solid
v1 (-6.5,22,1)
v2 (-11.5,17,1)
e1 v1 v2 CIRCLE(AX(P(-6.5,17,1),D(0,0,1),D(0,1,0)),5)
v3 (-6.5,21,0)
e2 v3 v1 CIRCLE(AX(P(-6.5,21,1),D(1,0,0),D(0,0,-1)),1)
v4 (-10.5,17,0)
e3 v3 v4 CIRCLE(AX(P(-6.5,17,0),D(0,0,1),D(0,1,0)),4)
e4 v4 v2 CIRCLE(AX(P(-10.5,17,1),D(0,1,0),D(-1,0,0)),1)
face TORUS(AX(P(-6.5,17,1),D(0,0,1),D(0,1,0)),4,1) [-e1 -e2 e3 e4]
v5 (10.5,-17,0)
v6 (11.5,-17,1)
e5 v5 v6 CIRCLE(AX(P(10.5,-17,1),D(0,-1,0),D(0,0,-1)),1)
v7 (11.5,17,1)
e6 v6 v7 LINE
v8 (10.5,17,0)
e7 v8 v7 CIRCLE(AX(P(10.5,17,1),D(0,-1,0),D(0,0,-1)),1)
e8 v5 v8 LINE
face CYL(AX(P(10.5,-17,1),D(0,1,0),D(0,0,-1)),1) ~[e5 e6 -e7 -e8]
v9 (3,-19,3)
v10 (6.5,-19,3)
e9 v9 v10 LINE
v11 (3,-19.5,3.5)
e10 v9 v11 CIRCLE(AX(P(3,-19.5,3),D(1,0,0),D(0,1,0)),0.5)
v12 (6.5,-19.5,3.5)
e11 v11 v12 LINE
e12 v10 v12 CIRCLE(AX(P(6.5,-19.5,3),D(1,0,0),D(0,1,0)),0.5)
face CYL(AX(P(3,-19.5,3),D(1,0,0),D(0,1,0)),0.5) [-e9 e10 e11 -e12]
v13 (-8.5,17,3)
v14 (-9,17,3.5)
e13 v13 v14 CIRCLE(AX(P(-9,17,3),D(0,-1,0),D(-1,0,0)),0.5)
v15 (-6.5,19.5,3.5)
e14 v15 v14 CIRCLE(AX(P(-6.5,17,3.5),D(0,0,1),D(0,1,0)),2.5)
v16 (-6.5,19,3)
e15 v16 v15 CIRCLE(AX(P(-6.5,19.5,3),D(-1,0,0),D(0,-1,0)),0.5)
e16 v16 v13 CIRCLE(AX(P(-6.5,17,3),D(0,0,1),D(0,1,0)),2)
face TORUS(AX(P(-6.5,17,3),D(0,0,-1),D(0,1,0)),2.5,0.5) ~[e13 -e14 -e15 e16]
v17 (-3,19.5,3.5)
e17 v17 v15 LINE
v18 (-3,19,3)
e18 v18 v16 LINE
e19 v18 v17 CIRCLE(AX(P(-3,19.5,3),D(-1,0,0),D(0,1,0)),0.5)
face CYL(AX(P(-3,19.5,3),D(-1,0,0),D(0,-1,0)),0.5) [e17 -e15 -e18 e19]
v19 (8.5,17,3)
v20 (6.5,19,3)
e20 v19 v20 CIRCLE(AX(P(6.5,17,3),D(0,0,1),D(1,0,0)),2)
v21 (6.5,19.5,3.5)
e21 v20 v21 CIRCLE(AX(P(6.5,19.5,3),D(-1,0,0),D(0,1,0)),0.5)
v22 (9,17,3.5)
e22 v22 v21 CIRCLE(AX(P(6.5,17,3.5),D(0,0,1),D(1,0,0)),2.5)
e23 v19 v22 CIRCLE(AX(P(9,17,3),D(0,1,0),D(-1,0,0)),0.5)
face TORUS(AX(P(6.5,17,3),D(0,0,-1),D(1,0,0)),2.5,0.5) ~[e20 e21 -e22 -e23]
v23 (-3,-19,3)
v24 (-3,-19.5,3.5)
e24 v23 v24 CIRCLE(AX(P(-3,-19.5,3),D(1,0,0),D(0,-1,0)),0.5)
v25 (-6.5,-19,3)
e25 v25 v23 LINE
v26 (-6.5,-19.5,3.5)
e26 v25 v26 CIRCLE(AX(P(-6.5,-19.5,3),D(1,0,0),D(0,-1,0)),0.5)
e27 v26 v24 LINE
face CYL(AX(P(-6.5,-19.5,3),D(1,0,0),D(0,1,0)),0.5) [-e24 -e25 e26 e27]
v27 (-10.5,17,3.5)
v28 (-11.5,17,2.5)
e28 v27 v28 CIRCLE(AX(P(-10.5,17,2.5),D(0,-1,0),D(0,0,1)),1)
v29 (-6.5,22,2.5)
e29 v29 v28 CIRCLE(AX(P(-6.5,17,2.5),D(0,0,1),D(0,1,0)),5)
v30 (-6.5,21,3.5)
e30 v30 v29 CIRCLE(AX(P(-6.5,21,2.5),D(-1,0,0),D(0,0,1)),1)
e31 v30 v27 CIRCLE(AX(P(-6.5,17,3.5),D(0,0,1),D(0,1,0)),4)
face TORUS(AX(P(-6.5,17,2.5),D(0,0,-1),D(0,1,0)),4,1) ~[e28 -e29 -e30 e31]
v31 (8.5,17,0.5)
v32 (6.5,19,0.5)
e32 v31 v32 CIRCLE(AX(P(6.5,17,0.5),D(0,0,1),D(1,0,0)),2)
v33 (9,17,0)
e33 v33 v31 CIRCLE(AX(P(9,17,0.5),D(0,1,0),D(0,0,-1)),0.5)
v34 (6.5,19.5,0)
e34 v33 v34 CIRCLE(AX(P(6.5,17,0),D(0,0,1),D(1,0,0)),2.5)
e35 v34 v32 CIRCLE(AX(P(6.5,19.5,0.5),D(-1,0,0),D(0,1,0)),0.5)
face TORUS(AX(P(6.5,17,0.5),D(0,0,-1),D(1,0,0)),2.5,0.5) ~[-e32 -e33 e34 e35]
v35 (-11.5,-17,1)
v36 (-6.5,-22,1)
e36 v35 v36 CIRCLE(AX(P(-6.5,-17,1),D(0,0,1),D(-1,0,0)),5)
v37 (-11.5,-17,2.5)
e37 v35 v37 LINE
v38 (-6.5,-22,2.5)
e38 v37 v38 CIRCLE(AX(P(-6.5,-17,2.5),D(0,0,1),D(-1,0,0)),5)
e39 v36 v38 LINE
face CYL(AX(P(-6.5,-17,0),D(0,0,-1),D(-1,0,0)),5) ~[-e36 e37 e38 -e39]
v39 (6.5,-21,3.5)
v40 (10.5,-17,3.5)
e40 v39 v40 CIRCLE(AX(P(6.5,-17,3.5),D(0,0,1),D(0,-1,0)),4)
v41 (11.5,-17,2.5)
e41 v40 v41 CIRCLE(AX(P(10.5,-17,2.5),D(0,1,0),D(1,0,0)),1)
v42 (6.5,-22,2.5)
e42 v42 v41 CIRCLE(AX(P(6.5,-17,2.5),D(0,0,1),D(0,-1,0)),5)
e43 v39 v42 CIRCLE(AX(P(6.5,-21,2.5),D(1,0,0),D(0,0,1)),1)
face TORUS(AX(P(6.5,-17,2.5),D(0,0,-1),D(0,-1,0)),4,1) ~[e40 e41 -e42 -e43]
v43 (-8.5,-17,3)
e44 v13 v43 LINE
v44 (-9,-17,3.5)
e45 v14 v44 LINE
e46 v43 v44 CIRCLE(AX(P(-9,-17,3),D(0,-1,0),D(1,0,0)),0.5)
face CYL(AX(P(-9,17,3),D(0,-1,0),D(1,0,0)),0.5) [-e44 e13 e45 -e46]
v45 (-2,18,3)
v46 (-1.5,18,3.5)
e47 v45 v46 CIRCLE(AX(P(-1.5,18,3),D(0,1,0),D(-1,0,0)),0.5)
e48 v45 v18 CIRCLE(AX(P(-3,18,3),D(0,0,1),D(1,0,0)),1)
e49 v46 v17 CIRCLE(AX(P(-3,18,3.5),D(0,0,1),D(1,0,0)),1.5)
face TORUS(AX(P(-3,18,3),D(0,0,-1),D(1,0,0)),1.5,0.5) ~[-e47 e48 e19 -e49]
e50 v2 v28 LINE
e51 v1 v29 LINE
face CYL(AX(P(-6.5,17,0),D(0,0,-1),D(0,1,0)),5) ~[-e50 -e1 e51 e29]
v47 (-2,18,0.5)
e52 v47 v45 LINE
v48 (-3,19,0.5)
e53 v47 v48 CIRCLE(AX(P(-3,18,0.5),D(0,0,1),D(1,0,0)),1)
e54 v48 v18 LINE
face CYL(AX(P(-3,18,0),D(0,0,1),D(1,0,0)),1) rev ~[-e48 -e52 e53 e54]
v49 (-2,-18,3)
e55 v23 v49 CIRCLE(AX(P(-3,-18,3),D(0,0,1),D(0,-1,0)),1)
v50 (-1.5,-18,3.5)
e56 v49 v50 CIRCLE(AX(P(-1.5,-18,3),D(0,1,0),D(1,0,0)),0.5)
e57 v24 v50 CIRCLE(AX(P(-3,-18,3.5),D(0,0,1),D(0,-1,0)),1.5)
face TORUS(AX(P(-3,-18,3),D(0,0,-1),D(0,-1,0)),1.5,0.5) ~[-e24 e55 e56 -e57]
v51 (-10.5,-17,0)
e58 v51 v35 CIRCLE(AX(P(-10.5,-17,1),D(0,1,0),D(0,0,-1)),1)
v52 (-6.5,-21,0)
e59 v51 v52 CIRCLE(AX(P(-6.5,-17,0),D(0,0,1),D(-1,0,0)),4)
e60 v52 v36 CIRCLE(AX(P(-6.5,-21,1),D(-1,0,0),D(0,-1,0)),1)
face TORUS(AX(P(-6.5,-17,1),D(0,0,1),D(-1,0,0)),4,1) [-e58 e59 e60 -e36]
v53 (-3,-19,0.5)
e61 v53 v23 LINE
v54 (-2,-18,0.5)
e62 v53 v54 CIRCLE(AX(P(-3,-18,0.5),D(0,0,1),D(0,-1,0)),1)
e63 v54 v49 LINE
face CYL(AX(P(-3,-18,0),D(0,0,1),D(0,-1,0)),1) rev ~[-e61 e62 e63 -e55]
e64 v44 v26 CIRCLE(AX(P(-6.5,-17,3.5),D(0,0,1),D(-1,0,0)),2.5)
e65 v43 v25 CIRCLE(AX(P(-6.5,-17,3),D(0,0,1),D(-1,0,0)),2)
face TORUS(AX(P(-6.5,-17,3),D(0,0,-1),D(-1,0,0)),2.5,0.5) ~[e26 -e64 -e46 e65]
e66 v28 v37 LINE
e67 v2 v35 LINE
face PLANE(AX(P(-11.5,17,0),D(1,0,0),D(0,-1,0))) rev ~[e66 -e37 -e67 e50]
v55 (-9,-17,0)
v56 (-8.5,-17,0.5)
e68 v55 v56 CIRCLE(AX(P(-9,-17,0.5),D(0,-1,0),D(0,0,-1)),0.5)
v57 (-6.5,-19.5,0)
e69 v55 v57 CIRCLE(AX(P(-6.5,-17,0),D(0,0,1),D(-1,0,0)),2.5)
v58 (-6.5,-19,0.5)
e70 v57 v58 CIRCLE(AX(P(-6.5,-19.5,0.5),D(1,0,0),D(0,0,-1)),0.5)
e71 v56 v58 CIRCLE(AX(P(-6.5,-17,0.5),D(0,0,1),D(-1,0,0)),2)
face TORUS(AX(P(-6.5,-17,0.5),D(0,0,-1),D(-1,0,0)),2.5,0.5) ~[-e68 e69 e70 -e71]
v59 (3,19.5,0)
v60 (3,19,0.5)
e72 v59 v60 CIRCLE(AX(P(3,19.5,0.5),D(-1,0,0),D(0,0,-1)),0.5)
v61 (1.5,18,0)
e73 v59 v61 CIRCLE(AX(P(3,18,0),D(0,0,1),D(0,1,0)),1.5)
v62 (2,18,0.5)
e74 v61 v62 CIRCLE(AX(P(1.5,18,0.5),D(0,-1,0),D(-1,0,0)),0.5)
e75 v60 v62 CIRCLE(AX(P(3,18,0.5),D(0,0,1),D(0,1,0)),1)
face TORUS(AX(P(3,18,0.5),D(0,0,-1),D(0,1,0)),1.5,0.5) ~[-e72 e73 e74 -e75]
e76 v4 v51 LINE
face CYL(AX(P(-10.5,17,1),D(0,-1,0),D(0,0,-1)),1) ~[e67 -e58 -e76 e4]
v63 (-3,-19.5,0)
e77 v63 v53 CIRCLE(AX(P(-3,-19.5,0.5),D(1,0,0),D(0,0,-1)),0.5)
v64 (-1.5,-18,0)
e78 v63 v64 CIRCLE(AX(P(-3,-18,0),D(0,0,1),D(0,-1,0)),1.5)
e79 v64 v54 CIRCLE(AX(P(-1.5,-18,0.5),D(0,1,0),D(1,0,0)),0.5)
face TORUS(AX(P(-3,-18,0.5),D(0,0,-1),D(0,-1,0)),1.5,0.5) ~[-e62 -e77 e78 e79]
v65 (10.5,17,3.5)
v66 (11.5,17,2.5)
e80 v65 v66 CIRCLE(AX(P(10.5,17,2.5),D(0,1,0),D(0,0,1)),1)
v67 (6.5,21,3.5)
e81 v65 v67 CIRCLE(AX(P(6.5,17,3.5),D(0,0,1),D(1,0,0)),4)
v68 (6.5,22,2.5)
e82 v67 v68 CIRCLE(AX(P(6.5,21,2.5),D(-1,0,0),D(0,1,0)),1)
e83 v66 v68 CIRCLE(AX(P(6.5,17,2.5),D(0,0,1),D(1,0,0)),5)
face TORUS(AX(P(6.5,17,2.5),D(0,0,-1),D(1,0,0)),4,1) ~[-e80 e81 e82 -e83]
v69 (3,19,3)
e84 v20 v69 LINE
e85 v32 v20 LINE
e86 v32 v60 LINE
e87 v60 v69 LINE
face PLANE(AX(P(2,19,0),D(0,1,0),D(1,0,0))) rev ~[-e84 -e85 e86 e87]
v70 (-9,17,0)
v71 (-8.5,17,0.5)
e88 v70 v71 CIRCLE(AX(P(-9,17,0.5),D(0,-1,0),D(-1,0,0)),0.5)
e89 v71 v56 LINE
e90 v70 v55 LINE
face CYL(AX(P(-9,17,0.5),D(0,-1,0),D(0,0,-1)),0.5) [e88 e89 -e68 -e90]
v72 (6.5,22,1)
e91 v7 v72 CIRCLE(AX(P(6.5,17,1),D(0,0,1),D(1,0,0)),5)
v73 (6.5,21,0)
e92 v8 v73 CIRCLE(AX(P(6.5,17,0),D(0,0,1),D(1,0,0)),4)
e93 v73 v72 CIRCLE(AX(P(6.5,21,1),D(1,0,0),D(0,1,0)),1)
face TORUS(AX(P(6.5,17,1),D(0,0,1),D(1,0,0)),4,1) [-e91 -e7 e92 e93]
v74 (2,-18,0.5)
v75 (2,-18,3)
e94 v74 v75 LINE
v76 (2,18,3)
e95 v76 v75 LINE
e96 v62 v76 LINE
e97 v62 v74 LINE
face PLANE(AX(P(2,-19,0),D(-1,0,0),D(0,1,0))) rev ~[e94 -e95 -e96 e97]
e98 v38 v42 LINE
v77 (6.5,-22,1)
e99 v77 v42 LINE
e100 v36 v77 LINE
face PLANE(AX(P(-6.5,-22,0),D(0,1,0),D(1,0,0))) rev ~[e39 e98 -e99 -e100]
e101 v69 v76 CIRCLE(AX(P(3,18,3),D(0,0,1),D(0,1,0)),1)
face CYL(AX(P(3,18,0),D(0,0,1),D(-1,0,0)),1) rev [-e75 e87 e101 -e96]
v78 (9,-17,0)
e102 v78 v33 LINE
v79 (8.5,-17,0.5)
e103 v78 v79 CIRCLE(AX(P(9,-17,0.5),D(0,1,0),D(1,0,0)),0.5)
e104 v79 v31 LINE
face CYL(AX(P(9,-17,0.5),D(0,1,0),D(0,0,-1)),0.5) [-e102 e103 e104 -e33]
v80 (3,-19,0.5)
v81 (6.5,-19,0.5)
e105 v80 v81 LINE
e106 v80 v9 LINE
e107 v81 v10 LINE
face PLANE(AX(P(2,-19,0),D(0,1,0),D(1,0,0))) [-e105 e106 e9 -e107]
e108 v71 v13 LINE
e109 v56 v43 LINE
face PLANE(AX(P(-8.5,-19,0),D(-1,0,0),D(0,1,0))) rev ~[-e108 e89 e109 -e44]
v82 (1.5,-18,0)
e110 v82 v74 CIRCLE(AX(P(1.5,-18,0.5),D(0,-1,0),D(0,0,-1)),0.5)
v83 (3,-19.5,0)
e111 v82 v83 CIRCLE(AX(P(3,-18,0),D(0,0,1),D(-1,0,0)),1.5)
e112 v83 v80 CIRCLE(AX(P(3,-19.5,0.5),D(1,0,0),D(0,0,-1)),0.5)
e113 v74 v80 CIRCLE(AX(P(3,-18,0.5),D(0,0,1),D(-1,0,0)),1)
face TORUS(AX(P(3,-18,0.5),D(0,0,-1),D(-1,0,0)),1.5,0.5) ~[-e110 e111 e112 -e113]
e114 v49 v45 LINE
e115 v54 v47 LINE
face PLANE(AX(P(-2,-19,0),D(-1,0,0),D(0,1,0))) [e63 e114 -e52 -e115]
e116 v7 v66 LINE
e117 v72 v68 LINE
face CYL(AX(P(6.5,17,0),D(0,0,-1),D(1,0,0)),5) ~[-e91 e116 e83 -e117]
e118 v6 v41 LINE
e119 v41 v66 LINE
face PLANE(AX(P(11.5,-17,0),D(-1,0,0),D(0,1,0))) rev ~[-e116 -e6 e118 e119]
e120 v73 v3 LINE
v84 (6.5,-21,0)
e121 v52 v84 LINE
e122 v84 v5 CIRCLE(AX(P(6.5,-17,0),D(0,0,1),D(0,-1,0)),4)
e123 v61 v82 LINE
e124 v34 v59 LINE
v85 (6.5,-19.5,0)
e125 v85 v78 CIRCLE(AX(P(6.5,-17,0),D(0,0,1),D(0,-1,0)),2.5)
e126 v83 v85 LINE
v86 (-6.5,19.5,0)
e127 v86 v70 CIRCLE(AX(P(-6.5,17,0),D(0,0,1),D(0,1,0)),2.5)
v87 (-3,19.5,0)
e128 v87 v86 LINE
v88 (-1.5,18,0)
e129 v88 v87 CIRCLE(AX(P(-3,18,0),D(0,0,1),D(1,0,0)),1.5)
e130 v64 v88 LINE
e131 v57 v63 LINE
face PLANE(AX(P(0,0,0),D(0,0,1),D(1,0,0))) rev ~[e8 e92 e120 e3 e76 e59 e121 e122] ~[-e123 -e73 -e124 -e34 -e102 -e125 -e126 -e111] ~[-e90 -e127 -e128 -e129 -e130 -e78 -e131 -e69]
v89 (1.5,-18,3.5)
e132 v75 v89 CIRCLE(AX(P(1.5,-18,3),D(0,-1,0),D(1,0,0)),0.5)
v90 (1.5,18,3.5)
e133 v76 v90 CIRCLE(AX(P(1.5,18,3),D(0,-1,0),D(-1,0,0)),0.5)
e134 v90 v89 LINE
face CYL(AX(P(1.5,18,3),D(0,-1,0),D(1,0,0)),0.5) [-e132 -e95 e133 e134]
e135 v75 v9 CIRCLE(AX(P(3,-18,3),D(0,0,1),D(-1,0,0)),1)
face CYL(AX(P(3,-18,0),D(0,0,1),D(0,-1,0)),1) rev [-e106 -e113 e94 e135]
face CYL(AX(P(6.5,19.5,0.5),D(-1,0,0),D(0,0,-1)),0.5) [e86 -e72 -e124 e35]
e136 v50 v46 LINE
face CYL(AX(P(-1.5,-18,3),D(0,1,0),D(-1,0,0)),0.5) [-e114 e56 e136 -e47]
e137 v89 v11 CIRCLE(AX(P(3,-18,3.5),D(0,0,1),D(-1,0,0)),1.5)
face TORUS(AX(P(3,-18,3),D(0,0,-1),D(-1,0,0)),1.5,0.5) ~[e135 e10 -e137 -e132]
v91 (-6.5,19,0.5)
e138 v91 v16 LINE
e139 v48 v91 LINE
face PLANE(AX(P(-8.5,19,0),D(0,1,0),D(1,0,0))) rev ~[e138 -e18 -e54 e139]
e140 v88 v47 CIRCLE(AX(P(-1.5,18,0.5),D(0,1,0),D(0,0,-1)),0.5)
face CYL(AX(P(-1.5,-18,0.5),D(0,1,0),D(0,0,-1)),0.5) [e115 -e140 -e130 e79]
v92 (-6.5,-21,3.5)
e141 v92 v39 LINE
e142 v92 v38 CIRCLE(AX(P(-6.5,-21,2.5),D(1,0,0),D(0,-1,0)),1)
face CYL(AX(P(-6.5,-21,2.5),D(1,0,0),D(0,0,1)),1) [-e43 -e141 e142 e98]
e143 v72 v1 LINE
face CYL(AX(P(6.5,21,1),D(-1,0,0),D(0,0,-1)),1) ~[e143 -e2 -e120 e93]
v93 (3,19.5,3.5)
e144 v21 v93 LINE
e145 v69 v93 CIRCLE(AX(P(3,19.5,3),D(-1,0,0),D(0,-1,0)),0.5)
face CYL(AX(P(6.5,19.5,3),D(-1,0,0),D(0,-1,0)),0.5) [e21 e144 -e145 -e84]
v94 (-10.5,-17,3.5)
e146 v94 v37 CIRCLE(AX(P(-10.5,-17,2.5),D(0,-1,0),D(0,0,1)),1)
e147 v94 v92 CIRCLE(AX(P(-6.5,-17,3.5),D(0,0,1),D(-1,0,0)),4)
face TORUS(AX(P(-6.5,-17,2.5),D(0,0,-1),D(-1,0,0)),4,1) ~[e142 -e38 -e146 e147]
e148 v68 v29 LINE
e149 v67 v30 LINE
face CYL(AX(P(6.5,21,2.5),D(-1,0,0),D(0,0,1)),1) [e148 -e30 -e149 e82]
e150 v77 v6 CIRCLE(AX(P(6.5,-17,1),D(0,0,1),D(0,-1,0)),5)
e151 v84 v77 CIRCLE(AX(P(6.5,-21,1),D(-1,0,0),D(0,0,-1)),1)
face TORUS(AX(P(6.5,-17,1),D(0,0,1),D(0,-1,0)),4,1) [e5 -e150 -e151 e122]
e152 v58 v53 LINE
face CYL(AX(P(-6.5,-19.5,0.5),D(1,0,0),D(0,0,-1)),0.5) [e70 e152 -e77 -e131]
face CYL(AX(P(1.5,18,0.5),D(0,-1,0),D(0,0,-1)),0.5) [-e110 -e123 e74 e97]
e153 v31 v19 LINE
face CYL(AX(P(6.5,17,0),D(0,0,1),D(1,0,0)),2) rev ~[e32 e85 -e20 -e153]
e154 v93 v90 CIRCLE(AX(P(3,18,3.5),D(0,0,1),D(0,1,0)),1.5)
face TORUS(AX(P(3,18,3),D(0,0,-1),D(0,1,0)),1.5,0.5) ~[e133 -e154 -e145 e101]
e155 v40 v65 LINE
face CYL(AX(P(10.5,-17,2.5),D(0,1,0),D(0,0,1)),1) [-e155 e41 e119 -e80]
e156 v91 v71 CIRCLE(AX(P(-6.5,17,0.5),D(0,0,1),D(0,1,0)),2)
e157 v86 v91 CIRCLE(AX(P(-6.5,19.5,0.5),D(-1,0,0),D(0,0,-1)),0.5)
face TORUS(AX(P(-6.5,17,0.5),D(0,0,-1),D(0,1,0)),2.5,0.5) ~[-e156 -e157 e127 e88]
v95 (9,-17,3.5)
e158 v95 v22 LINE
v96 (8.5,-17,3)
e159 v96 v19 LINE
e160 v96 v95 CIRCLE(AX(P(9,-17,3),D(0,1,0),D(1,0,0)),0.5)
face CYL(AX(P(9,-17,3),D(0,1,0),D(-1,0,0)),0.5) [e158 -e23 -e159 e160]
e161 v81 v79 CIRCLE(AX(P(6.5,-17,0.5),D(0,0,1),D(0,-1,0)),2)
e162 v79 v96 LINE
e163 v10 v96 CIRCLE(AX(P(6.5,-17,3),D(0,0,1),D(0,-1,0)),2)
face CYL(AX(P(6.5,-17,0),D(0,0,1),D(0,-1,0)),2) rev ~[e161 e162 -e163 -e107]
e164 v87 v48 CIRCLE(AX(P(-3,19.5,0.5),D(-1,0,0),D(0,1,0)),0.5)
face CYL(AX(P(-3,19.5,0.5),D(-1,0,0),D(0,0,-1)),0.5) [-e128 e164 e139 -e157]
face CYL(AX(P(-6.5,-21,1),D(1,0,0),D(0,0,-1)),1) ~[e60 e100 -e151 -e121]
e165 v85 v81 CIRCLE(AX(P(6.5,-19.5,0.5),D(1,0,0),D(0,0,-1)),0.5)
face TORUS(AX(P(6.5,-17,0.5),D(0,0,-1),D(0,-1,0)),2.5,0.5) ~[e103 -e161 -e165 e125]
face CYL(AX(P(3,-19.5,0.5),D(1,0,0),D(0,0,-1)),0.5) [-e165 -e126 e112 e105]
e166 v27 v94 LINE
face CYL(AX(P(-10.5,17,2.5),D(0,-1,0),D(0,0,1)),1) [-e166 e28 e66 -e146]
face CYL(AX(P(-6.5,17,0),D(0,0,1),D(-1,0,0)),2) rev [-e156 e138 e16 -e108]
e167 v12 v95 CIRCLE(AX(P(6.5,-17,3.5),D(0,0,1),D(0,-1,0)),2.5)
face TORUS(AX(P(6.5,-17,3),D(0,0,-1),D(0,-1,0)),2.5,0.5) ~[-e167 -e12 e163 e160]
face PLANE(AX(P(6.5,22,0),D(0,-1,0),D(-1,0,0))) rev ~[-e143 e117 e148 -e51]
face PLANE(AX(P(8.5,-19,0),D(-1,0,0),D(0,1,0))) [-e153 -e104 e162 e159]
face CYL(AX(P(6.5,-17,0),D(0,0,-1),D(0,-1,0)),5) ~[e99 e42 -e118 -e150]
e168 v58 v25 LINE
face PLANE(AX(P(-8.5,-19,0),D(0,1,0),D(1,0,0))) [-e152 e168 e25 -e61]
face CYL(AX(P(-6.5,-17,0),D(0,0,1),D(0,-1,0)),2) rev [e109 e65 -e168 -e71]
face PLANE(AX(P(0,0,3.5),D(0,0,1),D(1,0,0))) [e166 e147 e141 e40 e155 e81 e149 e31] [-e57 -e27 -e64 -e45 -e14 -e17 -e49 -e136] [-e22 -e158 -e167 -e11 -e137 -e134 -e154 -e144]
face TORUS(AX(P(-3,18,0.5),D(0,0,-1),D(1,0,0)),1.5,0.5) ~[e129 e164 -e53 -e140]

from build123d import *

# Parameters (mm, degrees)
F0_W     = 6.5
F0_H     = 38
F1_DEPTH = 3.5
F2_R     = 2
F3_R     = 1
F4_R     = 1
F5_R     = 0.5


with BuildPart() as f1:
    # F0 (on Top) → F1 (new body)
    with BuildSketch(Plane.XY):
        with BuildLine():
            Line((6.5, 22), (-6.5, 22))
            ThreePointArc((-6.5, 22), (-10.0355339059, 20.5355339059), (-11.5, 17))
            Line((-11.5, 17), (-11.5, -17))
            ThreePointArc((-11.5, -17), (-10.0355339059, -20.5355339059), (-6.5, -22))
            Line((-6.5, -22), (6.5, -22))
            ThreePointArc((6.5, -22), (10.0355339059, -20.5355339059), (11.5, -17))
            Line((11.5, -17), (11.5, 17))
            ThreePointArc((11.5, 17), (10.0355339059, 20.5355339059), (6.5, 22))
        make_face()
        with Locations((-5.25, 0)):
            Rectangle(F0_W, F0_H, mode=Mode.SUBTRACT)
        with Locations((5.25, 0)):
            Rectangle(F0_W, F0_H, mode=Mode.SUBTRACT)
    extrude(amount=F1_DEPTH)

    # F2
    f2_edges = [f1.edges().sort_by_distance(p)[0] for p in [
        (-8.5, 19, 1.75),
        (8.5, -19, 1.75),
        (8.5, 19, 1.75),
        (-8.5, -19, 1.75),
    ]]
    fillet(f2_edges, radius=F2_R)

    # F3
    f3_edges = [f1.edges().sort_by_distance(p)[0] for p in [
        (2, 19, 1.75),
        (-2, 19, 1.75),
        (-2, -19, 1.75),
        (2, -19, 1.75),
    ]]
    fillet(f3_edges, radius=F3_R)

    # F4
    f4_edges = [f1.edges().sort_by_distance(p)[0] for p in [
        (-11.5, 0, 3.5),
        (11.5, 0, 0),
        (10.035534, 20.535534, 0),
        (0, 22, 0),
        (-10.035534, 20.535534, 0),
        (-11.5, 0, 0),
        (-10.035534, -20.535534, 0),
        (0, -22, 0),
        (10.035534, -20.535534, 0),
        (10.035534, 20.535534, 3.5),
        (0, 22, 3.5),
        (-10.035534, 20.535534, 3.5),
        (-10.035534, -20.535534, 3.5),
        (0, -22, 3.5),
        (10.035534, -20.535534, 3.5),
        (11.5, 0, 3.5),
    ]]
    fillet(f4_edges, radius=F4_R)

    # F5
    f5_edges = [f1.edges().sort_by_distance(p)[0] for p in [
        (4.75, -19, 3.5),
        (-2.292893, -18.707107, 3.5),
        (-4.75, -19, 0),
        (4.75, -19, 0),
        (-2.292893, -18.707107, 0),
        (-7.914214, -18.414214, 0),
        (-2, 0, 0),
        (-8.5, 0, 0),
        (-2.292893, 18.707107, 0),
        (-7.914214, 18.414214, 0),
        (-4.75, 19, 0),
        (4.75, 19, 0),
        (2.292893, 18.707107, 0),
        (7.914214, 18.414214, 0),
        (2, 0, 0),
        (8.5, 0, 0),
        (2.292893, -18.707107, 0),
        (7.914214, -18.414214, 0),
        (-4.75, -19, 3.5),
        (-7.914214, -18.414214, 3.5),
        (-2, 0, 3.5),
        (-8.5, 0, 3.5),
        (-2.292893, 18.707107, 3.5),
        (-7.914214, 18.414214, 3.5),
        (-4.75, 19, 3.5),
        (4.75, 19, 3.5),
        (2.292893, 18.707107, 3.5),
        (7.914214, 18.414214, 3.5),
        (2, 0, 3.5),
        (8.5, 0, 3.5),
        (2.292893, -18.707107, 3.5),
        (7.914214, -18.414214, 3.5),
    ]]
    fillet(f5_edges, radius=F5_R)


solid = f1.part
